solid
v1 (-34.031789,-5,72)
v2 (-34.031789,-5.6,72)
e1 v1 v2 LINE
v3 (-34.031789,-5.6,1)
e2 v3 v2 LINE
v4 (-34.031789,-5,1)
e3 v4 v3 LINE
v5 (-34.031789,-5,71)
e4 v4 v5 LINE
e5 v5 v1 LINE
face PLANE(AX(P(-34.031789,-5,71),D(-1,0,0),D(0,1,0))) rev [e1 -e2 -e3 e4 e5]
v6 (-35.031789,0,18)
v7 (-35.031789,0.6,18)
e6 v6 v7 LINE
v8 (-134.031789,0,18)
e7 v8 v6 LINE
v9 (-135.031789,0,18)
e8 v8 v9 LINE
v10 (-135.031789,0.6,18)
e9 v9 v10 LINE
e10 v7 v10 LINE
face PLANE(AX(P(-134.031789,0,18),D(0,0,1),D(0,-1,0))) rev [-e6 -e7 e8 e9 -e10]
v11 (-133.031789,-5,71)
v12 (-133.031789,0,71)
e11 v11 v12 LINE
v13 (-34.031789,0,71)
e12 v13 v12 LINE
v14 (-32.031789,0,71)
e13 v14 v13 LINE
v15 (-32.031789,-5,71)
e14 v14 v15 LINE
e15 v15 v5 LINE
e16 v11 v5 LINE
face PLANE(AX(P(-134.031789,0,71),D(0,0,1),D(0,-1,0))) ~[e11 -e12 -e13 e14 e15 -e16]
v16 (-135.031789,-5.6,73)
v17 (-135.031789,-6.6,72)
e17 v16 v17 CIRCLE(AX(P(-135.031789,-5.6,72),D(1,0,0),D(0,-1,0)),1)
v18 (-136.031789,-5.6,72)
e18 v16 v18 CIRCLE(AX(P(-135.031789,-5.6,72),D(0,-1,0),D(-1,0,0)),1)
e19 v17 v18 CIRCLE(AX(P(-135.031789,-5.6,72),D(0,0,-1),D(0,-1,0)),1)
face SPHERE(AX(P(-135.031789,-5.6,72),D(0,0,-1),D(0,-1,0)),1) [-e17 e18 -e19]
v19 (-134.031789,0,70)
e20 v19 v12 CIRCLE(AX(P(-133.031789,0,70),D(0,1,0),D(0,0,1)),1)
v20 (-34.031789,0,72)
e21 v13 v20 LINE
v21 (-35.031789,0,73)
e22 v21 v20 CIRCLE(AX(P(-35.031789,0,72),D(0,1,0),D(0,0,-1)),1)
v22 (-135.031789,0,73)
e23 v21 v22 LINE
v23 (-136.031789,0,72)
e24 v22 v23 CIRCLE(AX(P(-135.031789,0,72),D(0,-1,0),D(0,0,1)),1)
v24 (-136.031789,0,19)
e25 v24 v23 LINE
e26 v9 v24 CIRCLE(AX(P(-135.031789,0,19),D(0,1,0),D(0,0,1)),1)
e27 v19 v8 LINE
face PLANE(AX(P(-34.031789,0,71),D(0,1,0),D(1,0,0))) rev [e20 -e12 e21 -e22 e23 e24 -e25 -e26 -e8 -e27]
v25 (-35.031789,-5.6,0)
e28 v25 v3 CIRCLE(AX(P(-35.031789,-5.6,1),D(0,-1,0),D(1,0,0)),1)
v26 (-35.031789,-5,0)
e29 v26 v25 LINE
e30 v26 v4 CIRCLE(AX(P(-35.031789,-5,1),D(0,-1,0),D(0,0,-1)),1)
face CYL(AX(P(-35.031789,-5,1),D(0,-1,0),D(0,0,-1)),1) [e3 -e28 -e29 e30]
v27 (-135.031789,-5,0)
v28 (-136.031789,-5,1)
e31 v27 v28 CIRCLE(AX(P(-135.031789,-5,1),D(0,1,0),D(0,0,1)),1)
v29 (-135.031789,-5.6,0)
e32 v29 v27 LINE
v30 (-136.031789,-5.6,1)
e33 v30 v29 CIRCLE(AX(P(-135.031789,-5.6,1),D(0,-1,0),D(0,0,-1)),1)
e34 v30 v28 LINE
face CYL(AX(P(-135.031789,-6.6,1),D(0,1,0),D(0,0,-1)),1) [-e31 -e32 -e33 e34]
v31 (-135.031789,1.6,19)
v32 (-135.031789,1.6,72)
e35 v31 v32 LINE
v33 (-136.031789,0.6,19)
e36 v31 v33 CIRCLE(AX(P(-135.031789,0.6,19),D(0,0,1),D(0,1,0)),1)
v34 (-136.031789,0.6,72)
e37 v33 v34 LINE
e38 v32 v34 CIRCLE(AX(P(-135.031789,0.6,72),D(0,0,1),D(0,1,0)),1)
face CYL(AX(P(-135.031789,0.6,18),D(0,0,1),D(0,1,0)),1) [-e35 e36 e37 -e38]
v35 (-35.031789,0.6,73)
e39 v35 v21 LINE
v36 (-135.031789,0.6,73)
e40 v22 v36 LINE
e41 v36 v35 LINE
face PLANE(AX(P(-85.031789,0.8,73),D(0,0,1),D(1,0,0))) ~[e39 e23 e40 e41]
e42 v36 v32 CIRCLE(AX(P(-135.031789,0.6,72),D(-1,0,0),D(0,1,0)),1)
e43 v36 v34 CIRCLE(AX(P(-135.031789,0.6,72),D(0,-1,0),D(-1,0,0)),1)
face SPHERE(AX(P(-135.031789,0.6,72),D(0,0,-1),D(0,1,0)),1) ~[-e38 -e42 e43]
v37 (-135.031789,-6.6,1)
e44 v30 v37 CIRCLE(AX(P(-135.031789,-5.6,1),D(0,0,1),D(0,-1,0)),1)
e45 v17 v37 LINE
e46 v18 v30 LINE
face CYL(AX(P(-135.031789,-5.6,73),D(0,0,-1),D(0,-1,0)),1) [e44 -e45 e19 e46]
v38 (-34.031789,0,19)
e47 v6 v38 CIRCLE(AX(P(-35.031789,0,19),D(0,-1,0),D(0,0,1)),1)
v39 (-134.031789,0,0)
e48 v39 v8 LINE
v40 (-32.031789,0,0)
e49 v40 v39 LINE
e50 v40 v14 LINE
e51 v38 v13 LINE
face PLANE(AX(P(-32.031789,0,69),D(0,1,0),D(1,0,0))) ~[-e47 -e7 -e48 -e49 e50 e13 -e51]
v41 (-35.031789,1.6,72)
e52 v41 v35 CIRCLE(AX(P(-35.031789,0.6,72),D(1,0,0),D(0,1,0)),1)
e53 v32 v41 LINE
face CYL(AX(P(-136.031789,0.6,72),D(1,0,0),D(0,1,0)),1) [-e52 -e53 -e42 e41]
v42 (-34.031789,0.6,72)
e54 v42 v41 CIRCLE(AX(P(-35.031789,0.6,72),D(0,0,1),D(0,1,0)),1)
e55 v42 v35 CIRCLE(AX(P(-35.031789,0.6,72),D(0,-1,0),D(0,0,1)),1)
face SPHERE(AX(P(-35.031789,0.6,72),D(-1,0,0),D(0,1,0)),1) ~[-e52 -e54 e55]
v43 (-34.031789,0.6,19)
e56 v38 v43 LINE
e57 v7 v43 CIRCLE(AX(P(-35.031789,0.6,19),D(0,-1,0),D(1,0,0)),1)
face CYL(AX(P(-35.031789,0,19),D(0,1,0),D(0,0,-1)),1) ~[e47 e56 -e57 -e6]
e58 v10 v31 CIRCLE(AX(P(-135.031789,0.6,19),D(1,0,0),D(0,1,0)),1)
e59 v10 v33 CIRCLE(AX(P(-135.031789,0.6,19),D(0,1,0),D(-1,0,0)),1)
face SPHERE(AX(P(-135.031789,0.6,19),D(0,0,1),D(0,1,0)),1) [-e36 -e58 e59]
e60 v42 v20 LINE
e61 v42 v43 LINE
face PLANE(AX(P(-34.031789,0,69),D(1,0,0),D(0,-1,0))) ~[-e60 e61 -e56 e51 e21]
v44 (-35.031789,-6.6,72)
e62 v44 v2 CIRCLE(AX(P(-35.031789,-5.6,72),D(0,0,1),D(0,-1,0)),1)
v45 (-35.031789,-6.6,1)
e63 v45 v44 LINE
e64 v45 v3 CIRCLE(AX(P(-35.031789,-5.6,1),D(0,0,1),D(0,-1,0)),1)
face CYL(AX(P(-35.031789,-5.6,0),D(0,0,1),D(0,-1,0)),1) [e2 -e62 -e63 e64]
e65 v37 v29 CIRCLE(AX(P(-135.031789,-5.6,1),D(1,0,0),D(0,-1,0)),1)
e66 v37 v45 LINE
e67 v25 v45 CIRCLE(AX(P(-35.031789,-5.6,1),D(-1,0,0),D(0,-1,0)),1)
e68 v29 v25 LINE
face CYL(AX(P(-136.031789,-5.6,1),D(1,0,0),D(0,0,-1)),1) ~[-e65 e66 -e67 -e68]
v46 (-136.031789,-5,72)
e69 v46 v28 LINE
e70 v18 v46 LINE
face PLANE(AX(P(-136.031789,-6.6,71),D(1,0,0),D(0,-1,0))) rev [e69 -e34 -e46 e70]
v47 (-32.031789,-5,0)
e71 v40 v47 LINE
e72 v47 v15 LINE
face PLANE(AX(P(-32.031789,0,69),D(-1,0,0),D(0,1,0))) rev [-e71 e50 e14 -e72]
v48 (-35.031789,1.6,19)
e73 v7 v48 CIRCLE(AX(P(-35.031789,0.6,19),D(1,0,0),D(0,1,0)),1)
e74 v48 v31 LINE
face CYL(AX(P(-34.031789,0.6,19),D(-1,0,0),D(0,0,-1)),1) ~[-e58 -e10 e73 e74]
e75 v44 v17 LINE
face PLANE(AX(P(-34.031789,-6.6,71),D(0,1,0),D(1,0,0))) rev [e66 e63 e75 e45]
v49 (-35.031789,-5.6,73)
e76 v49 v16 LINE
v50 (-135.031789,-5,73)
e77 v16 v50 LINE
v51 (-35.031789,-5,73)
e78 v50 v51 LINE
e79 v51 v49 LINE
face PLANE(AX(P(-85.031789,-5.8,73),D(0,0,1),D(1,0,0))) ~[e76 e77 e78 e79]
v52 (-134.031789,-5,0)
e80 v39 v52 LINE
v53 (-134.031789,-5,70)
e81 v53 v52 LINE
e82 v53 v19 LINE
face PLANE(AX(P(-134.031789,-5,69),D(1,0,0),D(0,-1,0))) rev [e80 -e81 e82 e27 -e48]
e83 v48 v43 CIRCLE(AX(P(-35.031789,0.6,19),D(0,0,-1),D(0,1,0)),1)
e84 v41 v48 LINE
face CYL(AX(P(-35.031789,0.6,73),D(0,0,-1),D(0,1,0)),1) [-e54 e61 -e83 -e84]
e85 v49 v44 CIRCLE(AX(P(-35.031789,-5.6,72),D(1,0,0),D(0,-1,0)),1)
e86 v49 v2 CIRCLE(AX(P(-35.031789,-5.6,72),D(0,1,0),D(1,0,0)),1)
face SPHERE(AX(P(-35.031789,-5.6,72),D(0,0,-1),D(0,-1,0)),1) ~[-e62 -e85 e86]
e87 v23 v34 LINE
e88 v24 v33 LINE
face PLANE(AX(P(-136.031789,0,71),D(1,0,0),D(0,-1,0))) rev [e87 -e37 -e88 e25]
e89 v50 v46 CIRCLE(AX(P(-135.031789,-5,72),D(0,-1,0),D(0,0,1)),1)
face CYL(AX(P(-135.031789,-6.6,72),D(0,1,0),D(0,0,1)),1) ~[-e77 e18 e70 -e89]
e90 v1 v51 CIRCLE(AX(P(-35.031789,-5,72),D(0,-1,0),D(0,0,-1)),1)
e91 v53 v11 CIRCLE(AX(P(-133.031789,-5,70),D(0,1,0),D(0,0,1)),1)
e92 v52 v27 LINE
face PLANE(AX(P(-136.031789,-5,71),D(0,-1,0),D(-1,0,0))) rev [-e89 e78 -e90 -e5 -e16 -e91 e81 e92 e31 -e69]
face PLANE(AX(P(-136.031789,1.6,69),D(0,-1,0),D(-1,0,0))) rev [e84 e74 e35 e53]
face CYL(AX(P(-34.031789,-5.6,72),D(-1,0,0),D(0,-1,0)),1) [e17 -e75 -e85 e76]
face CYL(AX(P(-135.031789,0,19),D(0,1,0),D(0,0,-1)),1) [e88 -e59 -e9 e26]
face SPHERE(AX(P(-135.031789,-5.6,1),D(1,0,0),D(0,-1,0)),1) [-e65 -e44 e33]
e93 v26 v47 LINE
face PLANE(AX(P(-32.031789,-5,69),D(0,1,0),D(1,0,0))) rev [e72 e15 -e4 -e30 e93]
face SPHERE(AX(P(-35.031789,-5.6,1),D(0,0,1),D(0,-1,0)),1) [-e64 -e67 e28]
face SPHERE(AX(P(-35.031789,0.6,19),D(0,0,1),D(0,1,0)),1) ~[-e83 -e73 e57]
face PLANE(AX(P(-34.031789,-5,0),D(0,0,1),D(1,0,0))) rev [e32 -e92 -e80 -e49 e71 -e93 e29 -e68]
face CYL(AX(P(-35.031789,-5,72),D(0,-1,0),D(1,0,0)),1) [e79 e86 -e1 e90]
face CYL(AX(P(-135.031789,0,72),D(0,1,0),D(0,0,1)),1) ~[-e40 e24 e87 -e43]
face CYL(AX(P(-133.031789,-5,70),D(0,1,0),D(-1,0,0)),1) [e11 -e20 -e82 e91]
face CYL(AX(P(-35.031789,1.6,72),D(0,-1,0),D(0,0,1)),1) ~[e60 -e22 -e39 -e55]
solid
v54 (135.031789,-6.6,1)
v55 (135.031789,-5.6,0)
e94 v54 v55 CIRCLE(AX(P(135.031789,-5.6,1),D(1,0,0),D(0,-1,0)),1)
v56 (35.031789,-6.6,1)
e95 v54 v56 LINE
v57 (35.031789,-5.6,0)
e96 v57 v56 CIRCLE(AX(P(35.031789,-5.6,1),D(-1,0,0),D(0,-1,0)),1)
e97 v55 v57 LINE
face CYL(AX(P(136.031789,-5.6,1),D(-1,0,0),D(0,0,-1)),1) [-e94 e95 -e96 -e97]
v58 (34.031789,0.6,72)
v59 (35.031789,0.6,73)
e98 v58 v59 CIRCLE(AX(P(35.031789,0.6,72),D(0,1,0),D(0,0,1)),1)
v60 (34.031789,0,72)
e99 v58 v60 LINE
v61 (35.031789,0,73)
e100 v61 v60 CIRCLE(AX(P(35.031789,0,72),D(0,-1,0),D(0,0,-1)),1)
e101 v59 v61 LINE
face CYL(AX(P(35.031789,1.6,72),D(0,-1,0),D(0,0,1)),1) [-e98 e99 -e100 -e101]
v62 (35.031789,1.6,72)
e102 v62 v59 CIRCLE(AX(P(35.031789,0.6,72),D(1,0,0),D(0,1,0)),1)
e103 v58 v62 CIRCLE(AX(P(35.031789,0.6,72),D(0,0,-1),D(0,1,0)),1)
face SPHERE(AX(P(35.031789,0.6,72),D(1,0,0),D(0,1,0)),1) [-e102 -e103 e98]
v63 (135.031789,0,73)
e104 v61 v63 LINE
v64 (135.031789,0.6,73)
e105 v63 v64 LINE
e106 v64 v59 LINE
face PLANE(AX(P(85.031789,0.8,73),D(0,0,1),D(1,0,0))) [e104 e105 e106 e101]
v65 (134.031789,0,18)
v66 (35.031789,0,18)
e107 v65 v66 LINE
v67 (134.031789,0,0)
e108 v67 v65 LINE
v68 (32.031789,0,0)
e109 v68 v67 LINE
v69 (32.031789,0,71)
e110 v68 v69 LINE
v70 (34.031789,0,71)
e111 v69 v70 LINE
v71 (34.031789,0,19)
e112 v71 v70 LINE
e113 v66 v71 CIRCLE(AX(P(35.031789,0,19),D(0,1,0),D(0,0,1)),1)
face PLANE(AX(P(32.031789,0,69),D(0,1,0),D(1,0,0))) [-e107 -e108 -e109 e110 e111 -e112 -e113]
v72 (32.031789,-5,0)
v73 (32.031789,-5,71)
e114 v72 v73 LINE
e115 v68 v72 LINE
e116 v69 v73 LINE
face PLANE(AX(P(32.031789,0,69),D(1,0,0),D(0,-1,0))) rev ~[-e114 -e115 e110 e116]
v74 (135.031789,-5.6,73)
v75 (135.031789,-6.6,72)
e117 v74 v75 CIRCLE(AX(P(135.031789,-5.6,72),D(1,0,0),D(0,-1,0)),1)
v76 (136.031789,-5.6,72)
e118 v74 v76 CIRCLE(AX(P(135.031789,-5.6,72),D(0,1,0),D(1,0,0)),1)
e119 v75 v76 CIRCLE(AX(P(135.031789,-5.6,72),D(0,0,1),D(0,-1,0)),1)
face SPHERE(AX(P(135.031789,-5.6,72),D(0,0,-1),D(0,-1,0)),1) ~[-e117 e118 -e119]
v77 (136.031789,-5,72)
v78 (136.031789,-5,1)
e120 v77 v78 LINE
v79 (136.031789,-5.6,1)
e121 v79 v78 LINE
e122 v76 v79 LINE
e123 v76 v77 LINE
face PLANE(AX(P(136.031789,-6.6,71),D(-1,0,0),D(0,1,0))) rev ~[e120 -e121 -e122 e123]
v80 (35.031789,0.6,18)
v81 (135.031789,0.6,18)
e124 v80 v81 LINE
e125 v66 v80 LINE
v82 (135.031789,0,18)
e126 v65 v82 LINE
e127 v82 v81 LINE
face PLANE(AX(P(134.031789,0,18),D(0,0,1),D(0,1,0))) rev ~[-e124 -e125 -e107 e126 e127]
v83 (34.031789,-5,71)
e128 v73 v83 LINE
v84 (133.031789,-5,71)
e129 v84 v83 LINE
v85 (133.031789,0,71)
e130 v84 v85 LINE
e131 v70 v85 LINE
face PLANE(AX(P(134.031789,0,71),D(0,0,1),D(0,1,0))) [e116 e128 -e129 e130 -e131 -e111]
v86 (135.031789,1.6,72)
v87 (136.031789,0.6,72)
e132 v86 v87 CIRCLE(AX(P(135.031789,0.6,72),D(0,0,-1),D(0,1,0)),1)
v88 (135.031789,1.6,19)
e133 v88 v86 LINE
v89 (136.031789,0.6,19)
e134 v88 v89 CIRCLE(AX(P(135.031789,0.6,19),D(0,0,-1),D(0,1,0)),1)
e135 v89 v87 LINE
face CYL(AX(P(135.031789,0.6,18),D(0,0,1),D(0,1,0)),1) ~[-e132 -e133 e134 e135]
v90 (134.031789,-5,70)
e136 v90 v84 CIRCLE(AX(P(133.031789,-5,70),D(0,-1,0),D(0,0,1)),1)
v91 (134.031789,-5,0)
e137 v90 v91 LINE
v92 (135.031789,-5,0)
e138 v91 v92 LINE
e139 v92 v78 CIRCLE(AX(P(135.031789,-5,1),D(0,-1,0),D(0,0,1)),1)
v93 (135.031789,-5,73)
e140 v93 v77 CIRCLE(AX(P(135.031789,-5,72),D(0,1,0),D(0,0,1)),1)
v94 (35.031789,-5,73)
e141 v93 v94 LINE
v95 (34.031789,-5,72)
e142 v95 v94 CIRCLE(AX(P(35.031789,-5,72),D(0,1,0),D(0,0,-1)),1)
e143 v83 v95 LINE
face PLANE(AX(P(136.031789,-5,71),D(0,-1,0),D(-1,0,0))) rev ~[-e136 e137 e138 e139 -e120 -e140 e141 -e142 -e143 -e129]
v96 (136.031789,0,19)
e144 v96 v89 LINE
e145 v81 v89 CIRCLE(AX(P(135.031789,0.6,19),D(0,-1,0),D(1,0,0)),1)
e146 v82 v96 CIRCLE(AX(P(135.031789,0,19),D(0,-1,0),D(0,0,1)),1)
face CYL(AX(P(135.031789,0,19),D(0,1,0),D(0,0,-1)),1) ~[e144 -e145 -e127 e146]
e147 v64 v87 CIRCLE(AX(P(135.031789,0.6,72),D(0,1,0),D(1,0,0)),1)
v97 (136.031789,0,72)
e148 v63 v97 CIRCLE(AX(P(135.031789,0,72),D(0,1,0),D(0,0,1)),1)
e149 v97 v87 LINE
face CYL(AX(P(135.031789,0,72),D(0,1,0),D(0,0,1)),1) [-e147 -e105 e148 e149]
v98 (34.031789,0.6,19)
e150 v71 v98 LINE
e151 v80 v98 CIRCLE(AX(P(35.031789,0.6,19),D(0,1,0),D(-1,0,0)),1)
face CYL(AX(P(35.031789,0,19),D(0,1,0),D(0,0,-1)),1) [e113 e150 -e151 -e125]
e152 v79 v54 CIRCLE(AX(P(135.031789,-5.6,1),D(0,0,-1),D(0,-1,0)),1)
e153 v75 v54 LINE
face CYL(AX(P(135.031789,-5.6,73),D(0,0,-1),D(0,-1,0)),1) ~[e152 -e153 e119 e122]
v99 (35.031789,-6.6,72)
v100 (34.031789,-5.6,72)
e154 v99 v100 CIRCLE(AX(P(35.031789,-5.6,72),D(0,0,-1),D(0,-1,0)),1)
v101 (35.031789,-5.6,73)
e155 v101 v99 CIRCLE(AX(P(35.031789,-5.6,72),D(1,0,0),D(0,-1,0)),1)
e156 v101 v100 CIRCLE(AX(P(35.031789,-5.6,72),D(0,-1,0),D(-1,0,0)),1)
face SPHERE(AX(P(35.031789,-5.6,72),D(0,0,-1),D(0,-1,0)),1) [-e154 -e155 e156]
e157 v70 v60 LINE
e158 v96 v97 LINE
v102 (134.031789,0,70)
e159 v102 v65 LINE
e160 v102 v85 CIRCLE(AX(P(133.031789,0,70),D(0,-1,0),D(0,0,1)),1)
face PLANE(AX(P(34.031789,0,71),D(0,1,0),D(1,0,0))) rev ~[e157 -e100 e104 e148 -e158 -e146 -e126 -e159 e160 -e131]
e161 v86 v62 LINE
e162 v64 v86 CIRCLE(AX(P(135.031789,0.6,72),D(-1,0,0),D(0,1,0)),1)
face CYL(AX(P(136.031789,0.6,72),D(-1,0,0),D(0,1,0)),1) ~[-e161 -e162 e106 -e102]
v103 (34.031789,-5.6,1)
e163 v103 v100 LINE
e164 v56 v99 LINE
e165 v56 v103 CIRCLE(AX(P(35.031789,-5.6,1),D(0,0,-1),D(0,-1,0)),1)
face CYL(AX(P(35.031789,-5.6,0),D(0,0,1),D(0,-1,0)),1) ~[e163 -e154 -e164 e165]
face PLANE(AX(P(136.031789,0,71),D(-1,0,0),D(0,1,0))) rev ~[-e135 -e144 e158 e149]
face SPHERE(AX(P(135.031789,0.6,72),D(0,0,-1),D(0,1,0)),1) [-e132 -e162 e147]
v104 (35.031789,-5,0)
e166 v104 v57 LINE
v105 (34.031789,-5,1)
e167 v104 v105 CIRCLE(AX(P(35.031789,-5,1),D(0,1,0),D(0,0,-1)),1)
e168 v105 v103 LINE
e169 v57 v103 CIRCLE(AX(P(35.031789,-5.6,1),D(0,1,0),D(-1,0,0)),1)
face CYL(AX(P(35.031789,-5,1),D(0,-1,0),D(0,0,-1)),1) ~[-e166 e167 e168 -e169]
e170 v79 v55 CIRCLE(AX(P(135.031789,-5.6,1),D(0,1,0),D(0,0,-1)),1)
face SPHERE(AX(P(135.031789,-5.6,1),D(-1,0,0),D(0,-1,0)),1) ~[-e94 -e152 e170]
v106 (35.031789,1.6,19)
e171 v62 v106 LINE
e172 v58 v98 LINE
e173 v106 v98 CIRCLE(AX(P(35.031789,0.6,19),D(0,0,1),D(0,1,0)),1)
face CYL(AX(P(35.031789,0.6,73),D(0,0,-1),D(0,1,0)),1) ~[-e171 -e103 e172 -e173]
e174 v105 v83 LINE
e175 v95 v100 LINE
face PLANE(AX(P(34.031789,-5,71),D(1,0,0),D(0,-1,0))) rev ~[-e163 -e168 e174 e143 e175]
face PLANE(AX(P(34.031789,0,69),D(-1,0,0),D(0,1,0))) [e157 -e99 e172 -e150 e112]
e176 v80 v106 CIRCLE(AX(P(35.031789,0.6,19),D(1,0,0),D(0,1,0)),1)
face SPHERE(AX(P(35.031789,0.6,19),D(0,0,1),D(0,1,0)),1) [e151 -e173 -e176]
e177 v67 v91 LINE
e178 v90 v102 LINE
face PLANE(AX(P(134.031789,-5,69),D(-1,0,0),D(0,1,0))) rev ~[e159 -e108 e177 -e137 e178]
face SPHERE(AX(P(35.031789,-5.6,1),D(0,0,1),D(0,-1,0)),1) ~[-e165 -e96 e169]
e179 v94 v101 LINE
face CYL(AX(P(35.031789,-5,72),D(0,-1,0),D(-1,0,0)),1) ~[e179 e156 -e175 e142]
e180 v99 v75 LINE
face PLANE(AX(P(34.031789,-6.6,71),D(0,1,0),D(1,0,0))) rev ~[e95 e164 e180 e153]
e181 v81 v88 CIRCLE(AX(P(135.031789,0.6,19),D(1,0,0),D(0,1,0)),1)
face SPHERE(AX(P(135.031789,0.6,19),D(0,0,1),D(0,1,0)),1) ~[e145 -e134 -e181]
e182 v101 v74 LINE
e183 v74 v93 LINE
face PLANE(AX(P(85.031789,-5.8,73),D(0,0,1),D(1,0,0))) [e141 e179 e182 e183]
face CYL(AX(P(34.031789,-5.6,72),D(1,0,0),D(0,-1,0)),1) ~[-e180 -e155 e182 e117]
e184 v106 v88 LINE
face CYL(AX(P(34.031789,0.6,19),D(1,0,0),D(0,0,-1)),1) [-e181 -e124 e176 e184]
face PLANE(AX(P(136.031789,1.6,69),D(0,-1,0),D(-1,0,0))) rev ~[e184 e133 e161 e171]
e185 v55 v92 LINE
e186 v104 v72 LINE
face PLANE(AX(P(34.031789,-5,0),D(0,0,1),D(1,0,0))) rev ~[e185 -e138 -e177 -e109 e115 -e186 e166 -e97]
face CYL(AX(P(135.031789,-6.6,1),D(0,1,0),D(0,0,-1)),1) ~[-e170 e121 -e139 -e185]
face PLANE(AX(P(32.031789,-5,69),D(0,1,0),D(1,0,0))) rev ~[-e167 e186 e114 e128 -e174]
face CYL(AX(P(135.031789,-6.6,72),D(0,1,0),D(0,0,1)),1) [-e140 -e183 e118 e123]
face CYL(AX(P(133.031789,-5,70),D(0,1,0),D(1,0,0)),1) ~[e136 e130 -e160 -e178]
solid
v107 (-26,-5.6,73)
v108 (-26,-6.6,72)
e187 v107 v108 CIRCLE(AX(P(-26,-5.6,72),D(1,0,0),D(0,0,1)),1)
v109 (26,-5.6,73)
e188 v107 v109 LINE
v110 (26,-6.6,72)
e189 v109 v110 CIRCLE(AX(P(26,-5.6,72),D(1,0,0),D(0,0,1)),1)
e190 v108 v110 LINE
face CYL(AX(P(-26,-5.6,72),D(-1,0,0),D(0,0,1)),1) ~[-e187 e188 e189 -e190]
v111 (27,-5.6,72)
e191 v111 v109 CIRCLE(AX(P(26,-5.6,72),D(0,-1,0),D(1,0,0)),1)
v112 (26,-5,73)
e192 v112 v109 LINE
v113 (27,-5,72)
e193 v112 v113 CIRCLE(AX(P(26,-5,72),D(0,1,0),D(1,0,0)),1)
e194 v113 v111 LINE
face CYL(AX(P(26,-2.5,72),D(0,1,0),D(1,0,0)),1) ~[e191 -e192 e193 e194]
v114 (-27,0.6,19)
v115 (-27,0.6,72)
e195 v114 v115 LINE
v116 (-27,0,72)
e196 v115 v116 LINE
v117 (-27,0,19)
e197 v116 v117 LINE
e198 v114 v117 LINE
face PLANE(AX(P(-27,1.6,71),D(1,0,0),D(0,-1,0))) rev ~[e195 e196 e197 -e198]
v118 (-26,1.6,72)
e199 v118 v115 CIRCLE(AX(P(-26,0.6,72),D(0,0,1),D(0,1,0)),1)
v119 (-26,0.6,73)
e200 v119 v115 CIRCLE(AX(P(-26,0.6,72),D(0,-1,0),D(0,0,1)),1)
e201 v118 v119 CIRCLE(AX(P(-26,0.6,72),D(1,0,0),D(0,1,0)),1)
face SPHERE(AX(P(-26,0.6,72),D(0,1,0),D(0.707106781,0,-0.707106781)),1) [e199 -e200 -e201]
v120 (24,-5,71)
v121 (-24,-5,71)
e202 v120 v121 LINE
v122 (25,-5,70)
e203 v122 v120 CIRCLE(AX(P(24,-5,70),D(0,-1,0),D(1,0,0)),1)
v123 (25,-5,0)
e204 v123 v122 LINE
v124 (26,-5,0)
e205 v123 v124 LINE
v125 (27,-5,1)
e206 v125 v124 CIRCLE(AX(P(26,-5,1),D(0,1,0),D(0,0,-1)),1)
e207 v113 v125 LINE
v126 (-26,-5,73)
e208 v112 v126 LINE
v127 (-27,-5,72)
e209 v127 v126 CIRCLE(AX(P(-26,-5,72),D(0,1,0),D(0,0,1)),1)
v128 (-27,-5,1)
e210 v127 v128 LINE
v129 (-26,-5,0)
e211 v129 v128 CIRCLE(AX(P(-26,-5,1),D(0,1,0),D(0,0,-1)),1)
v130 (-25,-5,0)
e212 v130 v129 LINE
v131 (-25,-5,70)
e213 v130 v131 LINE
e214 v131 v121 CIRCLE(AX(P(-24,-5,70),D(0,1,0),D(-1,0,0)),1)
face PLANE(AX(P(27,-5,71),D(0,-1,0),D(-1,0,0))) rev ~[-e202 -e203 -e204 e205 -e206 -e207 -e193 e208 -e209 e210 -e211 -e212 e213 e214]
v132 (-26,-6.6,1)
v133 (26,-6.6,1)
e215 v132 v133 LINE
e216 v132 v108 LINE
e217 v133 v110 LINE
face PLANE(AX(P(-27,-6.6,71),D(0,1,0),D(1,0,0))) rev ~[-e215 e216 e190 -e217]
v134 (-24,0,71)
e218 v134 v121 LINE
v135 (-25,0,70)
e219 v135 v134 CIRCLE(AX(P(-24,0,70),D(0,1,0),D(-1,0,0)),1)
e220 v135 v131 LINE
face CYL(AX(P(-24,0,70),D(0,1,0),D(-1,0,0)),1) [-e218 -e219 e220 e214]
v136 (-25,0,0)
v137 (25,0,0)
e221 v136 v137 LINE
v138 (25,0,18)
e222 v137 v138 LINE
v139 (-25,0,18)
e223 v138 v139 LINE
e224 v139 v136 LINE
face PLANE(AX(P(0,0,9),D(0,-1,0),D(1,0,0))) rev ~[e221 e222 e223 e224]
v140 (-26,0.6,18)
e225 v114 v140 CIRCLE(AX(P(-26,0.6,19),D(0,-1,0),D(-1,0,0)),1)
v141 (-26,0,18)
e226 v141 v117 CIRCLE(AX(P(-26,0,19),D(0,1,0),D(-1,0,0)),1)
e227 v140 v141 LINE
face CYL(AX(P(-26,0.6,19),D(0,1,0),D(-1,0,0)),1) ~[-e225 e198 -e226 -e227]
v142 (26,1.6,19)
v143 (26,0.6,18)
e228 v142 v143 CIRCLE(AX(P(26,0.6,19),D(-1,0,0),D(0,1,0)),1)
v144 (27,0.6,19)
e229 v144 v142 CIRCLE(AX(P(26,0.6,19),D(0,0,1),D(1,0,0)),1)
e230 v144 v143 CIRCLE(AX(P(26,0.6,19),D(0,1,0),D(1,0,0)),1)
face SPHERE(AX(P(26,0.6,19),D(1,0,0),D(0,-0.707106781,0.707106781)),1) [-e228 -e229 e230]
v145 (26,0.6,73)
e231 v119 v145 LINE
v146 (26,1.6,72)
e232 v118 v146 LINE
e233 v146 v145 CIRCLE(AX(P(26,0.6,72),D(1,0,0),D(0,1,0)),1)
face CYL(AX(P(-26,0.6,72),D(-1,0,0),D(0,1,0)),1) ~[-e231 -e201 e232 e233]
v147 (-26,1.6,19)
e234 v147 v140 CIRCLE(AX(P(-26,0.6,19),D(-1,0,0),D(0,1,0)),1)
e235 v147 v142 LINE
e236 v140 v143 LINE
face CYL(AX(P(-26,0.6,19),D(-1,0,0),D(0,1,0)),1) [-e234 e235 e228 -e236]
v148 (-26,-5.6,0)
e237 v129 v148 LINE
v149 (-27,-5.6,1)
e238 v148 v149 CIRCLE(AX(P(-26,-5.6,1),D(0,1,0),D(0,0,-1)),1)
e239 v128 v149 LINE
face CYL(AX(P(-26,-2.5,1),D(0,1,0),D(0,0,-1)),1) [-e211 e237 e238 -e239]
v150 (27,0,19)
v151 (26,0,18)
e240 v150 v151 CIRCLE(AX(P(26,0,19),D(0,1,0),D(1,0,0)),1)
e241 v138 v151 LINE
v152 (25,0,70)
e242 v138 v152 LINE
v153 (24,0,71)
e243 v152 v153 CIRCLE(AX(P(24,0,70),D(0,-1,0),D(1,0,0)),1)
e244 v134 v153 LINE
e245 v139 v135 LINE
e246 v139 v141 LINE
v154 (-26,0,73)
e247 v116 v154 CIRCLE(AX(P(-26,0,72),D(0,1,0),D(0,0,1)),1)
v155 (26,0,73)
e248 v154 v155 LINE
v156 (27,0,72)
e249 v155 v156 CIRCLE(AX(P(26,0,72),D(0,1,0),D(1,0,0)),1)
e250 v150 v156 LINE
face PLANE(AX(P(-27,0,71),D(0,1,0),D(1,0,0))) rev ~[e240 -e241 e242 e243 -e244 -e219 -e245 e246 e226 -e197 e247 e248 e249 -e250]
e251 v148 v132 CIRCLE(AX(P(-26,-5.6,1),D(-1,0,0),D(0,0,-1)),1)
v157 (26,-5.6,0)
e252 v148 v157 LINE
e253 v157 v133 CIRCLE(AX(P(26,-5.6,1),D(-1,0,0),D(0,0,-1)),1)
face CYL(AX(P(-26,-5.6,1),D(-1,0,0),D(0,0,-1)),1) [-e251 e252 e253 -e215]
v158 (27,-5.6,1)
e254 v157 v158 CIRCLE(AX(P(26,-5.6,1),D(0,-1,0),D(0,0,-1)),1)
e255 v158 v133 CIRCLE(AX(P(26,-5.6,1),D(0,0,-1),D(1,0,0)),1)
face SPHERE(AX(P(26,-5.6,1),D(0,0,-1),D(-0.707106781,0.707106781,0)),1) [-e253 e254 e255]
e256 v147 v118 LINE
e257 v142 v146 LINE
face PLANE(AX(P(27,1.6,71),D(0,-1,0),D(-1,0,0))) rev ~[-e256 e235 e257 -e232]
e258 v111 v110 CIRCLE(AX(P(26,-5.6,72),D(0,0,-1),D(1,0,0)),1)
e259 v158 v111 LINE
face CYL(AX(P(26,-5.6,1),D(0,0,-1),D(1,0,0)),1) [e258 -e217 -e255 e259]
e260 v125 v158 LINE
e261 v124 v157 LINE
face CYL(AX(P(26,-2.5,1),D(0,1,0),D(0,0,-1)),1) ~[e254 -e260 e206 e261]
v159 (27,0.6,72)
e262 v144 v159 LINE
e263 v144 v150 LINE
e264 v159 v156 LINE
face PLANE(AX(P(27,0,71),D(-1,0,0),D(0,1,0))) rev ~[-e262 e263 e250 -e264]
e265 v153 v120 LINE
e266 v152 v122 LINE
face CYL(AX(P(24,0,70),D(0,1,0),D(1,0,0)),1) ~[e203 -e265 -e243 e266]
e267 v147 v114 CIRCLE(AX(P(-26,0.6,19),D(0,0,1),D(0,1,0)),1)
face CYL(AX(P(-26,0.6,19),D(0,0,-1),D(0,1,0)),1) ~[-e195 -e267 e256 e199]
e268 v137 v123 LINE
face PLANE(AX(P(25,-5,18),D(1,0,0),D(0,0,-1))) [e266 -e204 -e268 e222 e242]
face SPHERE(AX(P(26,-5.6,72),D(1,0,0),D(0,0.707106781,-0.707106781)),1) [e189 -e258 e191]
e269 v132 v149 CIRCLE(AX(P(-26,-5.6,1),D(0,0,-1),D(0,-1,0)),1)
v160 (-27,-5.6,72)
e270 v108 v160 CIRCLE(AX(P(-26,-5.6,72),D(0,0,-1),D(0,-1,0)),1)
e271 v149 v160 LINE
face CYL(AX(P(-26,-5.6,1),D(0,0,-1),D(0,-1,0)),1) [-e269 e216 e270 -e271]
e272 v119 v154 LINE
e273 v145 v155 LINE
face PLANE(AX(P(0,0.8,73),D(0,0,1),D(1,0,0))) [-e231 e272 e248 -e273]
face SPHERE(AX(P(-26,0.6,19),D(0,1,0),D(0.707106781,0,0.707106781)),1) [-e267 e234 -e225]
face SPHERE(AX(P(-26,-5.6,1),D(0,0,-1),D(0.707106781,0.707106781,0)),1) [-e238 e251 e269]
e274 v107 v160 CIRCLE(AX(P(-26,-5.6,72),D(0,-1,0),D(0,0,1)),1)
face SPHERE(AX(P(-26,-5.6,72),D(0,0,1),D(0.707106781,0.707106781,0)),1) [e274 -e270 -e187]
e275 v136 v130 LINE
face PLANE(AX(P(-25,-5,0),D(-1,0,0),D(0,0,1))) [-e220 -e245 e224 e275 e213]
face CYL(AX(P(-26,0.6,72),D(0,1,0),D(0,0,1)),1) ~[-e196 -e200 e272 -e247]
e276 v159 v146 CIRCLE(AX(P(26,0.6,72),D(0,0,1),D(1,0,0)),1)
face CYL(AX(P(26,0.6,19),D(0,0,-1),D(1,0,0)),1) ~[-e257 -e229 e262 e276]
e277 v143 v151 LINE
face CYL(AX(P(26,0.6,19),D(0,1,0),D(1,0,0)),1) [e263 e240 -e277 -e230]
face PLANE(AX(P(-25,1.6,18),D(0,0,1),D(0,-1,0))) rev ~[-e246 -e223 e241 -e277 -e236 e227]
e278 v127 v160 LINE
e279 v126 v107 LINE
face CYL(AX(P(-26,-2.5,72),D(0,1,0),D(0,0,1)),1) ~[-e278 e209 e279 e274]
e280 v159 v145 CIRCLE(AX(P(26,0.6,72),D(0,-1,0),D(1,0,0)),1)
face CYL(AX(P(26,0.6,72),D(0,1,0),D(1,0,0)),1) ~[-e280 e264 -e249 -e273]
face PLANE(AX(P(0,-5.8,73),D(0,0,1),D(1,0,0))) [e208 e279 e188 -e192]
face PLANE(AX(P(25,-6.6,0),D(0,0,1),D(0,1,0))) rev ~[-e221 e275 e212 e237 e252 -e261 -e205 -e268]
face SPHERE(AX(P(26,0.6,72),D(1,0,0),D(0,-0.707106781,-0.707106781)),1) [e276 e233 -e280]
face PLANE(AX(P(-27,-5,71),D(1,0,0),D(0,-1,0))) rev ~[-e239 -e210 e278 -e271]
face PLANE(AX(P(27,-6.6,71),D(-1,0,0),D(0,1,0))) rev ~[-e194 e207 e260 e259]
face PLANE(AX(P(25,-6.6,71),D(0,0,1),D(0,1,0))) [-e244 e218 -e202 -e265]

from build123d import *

# Parameters (mm, degrees)
F0_W          = 50
F0_H          = 51
F1_DEPTH      = 5
F0_H_2        = 18
F2_DEPTH      = 5
F3_W          = 50
F3_H          = 51
F4_DEPTH      = 1.6
F5_W          = 50
F5_H          = 51
F6_DEPTH      = 1.6
F7_DEPTH      = 2
F8_W          = 1.6
F8_H          = 53
F9_DEPTH      = 2
F10_W         = 1.6
F10_H         = 53
F11_DEPTH     = 2
F12_DEPTH     = 1.6
F13_DEPTH     = 18
F15_DEPTH     = 2
F16_T1_DEPTH  = 52
F16_T3_DEPTH  = 5
F16_T5_DEPTH  = 3.1
F16_T7_DEPTH  = 3.1
F16_T9_DEPTH  = 53
F16_T11_DEPTH = 71
F16_S15_W     = 1.02
F16_S15_H     = 1.02
F16_T16_DEPTH = 1.02
F16_S21_W     = 1.02
F16_S21_H     = 1.02
F16_T22_DEPTH = 1.02
F16_S27_W     = 1.02
F16_S27_H     = 1.02
F16_T28_DEPTH = 1.02
F16_S33_W     = 1.02
F16_S33_H     = 1.02
F16_T34_DEPTH = 1.02
F16_S39_W     = 1.02
F16_S39_H     = 1.02
F16_T40_DEPTH = 1.02
F16_S45_W     = 1.02
F16_S45_H     = 1.02
F16_T46_DEPTH = 1.02
F16_S51_W     = 1.02
F16_S51_H     = 1.02
F16_T52_DEPTH = 1.02
F16_S57_W     = 1.02
F16_S57_H     = 1.02
F16_T58_DEPTH = 1.02
F17_W         = 102
F17_H         = 69
F18_DEPTH     = 5
F19_W         = 100
F19_H         = 51
F20_DEPTH     = 1.6
F21_W         = 100
F21_H         = 69
F22_DEPTH     = 1.6
F23_W         = 1.6
F23_H         = 51
F23_H_2       = 69
F24_DEPTH     = 2
F25_DEPTH     = 2
F27_DEPTH     = 2
F28_R         = 1


# Not quite as in the source:
# - a fillet or chamfer that OpenCascade refuses, or shapes differently, is made with other operations: its cross-section is extruded or revolved along the edge and cut away or added


with BuildPart() as f1:
    # F0 (on Front) → F1 (new body)
    with BuildSketch(Plane.XZ):
        with Locations((0, 43.5)):
            Rectangle(F0_W, F0_H)
    extrude(amount=F1_DEPTH)

    # F0 (on Front) → F2 (join)
    with BuildSketch(Plane.XZ):
        with Locations((0, 9)):
            Rectangle(F0_W, F0_H_2)
        with Locations((0, 43.5)):
            Rectangle(F0_W, F0_H)
    extrude(amount=F2_DEPTH)

    # F3 (on face) → F4 (join)
    with BuildSketch(Plane(origin=(0, 0, 0), x_dir=(-1, 0, 0), z_dir=(0, 1, 0))):
        with Locations((0, 43.5)):
            Rectangle(F3_W, F3_H)
    extrude(amount=F4_DEPTH)

    # F5 (on face) → F6 (join)
    with BuildSketch(Plane.XZ.offset(5)):
        with Locations((0, 43.5)):
            Rectangle(F5_W, F5_H)
    extrude(amount=F6_DEPTH)

    # F7 (add): a face of the model
    f7_faces = [f1.faces().sort_by_distance(p)[0] for p in [
        (0, -2.5, 69),
    ]]
    extrude(f7_faces, amount=F7_DEPTH)

    # F8 (on face) → F9 (join)
    with BuildSketch(Plane(origin=(-25, 0, 0), x_dir=(0, -1, 0), z_dir=(-1, 0, 0))):
        with Locations((-0.8, 44.5)):
            Rectangle(F8_W, F8_H)
        with Locations((5.8, 44.5)):
            Rectangle(F8_W, F8_H)
    extrude(amount=F9_DEPTH)

    # F10 (on face) → F11 (join)
    with BuildSketch(Plane.YZ.offset(25)):
        with Locations((-5.8, 44.5)):
            Rectangle(F10_W, F10_H)
        with Locations((0.8, 44.5)):
            Rectangle(F10_W, F10_H)
    extrude(amount=F11_DEPTH)

    # F12 (add): a face of the model
    f12_faces = [f1.faces().sort_by_distance(p)[0] for p in [
        (0, -5, 9),
    ]]
    extrude(f12_faces, amount=F12_DEPTH)

    # F13 (add, through all): faces of the model
    f13_faces = [f1.faces().sort_by_distance(p)[0] for p in [
        (26, -5.8, 18),
        (-26, -5.8, 18),
    ]]
    extrude(f13_faces, amount=F13_DEPTH)

    # F14 (on face) → F15 (join)
    with BuildSketch(Plane.XY.offset(71)):
        Polygon((25, -5), (-25, -5), (-27, -5), (-27, -6.6), (27, -6.6), (27, -5), align=None)
        Polygon((-27, 0), (-25, 0), (25, 0), (27, 0), (27, 1.6), (-27, 1.6), align=None)
    extrude(amount=F15_DEPTH)

    # F16: fillet of radius 1 on 20 edges, made by hand

    # F16_s2 → F16_t1 (cut)
    with BuildSketch(Plane.YZ.offset(-26)):
        with BuildLine():
            ThreePointArc((1.6, 19), (1.3071067812, 18.2928932188), (0.6, 18))
            Line((0.6, 18), (1.6, 18))
            Line((1.6, 18), (1.6, 19))
        make_face()
        with BuildLine():
            ThreePointArc((-5.6, 0), (-6.3071067812, 0.2928932188), (-6.6, 1))
            Line((-6.6, 1), (-6.6, 0))
            Line((-6.6, 0), (-5.6, 0))
        make_face()
        with BuildLine():
            ThreePointArc((1.6, 72), (1.3071067812, 72.7071067812), (0.6, 73))
            Line((0.6, 73), (1.6, 73))
            Line((1.6, 73), (1.6, 72))
        make_face()
        with BuildLine():
            ThreePointArc((-5.6, 73), (-6.3071067812, 72.7071067812), (-6.6, 72))
            Line((-6.6, 72), (-6.6, 73))
            Line((-6.6, 73), (-5.6, 73))
        make_face()
    extrude(amount=F16_T1_DEPTH, mode=Mode.SUBTRACT)

    # F16_s4 → F16_t3 (cut)
    with BuildSketch(Plane.XZ):
        with BuildLine():
            ThreePointArc((-25, 70), (-24.7071067812, 70.7071067812), (-24, 71))
            Line((-24, 71), (-25, 71))
            Line((-25, 71), (-25, 70))
        make_face()
        with BuildLine():
            ThreePointArc((25, 70), (24.7071067812, 70.7071067812), (24, 71))
            Line((24, 71), (25, 71))
            Line((25, 71), (25, 70))
        make_face()
    extrude(amount=F16_T3_DEPTH, mode=Mode.SUBTRACT)

    # F16_s6 → F16_t5 (cut)
    with BuildSketch(Plane.XZ.offset(-0.6)):
        with BuildLine():
            ThreePointArc((-27, 19), (-26.7071067812, 18.2928932188), (-26, 18))
            Line((-26, 18), (-27, 18))
            Line((-27, 18), (-27, 19))
        make_face()
        with BuildLine():
            ThreePointArc((27, 19), (26.7071067812, 18.2928932188), (26, 18))
            Line((26, 18), (27, 18))
            Line((27, 18), (27, 19))
        make_face()
        with BuildLine():
            ThreePointArc((27, 72), (26.7071067812, 72.7071067812), (26, 73))
            Line((26, 73), (27, 73))
            Line((27, 73), (27, 72))
        make_face()
        with BuildLine():
            ThreePointArc((-26, 73), (-26.7071067812, 72.7071067812), (-27, 72))
            Line((-27, 72), (-27, 73))
            Line((-27, 73), (-26, 73))
        make_face()
    extrude(amount=F16_T5_DEPTH, mode=Mode.SUBTRACT)

    # F16_s8 → F16_t7 (cut)
    with BuildSketch(Plane.XZ.offset(2.5)):
        with BuildLine():
            ThreePointArc((27, 72), (26.7071067812, 72.7071067812), (26, 73))
            Line((26, 73), (27, 73))
            Line((27, 73), (27, 72))
        make_face()
        with BuildLine():
            ThreePointArc((-26, 73), (-26.7071067812, 72.7071067812), (-27, 72))
            Line((-27, 72), (-27, 73))
            Line((-27, 73), (-26, 73))
        make_face()
        with BuildLine():
            ThreePointArc((-26, 0), (-26.7071067812, 0.2928932188), (-27, 1))
            Line((-27, 1), (-27, 0))
            Line((-27, 0), (-26, 0))
        make_face()
        with BuildLine():
            ThreePointArc((26, 0), (26.7071067812, 0.2928932188), (27, 1))
            Line((27, 1), (27, 0))
            Line((27, 0), (26, 0))
        make_face()
    extrude(amount=F16_T7_DEPTH, mode=Mode.SUBTRACT)

    # F16_s10 → F16_t9 (cut)
    with BuildSketch(Plane.XY.offset(19)):
        with BuildLine():
            ThreePointArc((27, 0.6), (26.7071067812, 1.3071067812), (26, 1.6))
            Line((26, 1.6), (27, 1.6))
            Line((27, 1.6), (27, 0.6))
        make_face()
        with BuildLine():
            ThreePointArc((-26, 1.6), (-26.7071067812, 1.3071067812), (-27, 0.6))
            Line((-27, 0.6), (-27, 1.6))
            Line((-27, 1.6), (-26, 1.6))
        make_face()
    extrude(amount=F16_T9_DEPTH, mode=Mode.SUBTRACT)

    # F16_s12 → F16_t11 (cut)
    with BuildSketch(Plane.XY.offset(1)):
        with BuildLine():
            ThreePointArc((27, -5.6), (26.7071067812, -6.3071067812), (26, -6.6))
            Line((26, -6.6), (27, -6.6))
            Line((27, -6.6), (27, -5.6))
        make_face()
        with BuildLine():
            ThreePointArc((-26, -6.6), (-26.7071067812, -6.3071067812), (-27, -5.6))
            Line((-27, -5.6), (-27, -6.6))
            Line((-27, -6.6), (-26, -6.6))
        make_face()
    extrude(amount=F16_T11_DEPTH, mode=Mode.SUBTRACT)


with BuildPart() as f16_tool14:
    # F16_s15 → F16_t16 (new body)
    with BuildSketch(Plane.YZ.offset(26)):
        with Locations((1.11, 18.49)):
            Rectangle(F16_S15_W, F16_S15_H)
    extrude(amount=F16_T16_DEPTH)

    # F16_s17 → F16_t18 (revolve, cut)
    with BuildSketch(Plane(origin=(26, 0.6, 19), x_dir=(0, -0.7071067812, 0.7071067812), z_dir=(0, 0.7071067812, 0.7071067812))):
        with BuildLine():
            ThreePointArc((0, -1), (1, 0), (0, 1))
            Line((0, 1), (0, -1))
        make_face()
    revolve(axis=Axis((26, 0.6, 19), (1, 0, 0)), mode=Mode.SUBTRACT)


with BuildPart() as f1_1:
    add(f1.part)

    # F16_t13: cut F16_tool14
    add(f16_tool14.part, mode=Mode.SUBTRACT)


with BuildPart() as f16_tool20:
    # F16_s21 → F16_t22 (new body)
    with BuildSketch(Plane.XZ.offset(-0.6)):
        with Locations((-26.51, 18.49)):
            Rectangle(F16_S21_W, F16_S21_H)
    extrude(amount=-F16_T22_DEPTH)

    # F16_s23 → F16_t24 (revolve, cut)
    with BuildSketch(Plane(origin=(-26, 0.6, 19), x_dir=(0.7071067812, 0, 0.7071067812), z_dir=(-0.7071067812, 0, 0.7071067812))):
        with BuildLine():
            ThreePointArc((0, -1), (1, 0), (0, 1))
            Line((0, 1), (0, -1))
        make_face()
    revolve(axis=Axis((-26, 0.6, 19), (0, 1, 0)), mode=Mode.SUBTRACT)


with BuildPart() as f1_2:
    add(f1_1.part)

    # F16_t19: cut F16_tool20
    add(f16_tool20.part, mode=Mode.SUBTRACT)


with BuildPart() as f16_tool26:
    # F16_s27 → F16_t28 (new body)
    with BuildSketch(Plane.XY.offset(1)):
        with Locations((26.51, -6.11)):
            Rectangle(F16_S27_W, F16_S27_H)
    extrude(amount=-F16_T28_DEPTH)

    # F16_s29 → F16_t30 (revolve, cut)
    with BuildSketch(Plane(origin=(26, -5.6, 1), x_dir=(-0.7071067812, 0.7071067812, 0), z_dir=(-0.7071067812, -0.7071067812, 0))):
        with BuildLine():
            ThreePointArc((0, -1), (1, 0), (0, 1))
            Line((0, 1), (0, -1))
        make_face()
    revolve(axis=Axis((26, -5.6, 1), (0, 0, -1)), mode=Mode.SUBTRACT)


with BuildPart() as f1_3:
    add(f1_2.part)

    # F16_t25: cut F16_tool26
    add(f16_tool26.part, mode=Mode.SUBTRACT)


with BuildPart() as f16_tool32:
    # F16_s33 → F16_t34 (new body)
    with BuildSketch(Plane.XY.offset(1)):
        with Locations((-26.51, -6.11)):
            Rectangle(F16_S33_W, F16_S33_H)
    extrude(amount=-F16_T34_DEPTH)

    # F16_s35 → F16_t36 (revolve, cut)
    with BuildSketch(Plane(origin=(-26, -5.6, 1), x_dir=(0.7071067812, 0.7071067812, 0), z_dir=(-0.7071067812, 0.7071067812, 0))):
        with BuildLine():
            ThreePointArc((0, -1), (1, 0), (0, 1))
            Line((0, 1), (0, -1))
        make_face()
    revolve(axis=Axis((-26, -5.6, 1), (0, 0, -1)), mode=Mode.SUBTRACT)


with BuildPart() as f1_4:
    add(f1_3.part)

    # F16_t31: cut F16_tool32
    add(f16_tool32.part, mode=Mode.SUBTRACT)


with BuildPart() as f16_tool38:
    # F16_s39 → F16_t40 (new body)
    with BuildSketch(Plane.YZ.offset(26)):
        with Locations((-6.11, 72.51)):
            Rectangle(F16_S39_W, F16_S39_H)
    extrude(amount=F16_T40_DEPTH)

    # F16_s41 → F16_t42 (revolve, cut)
    with BuildSketch(Plane(origin=(26, -5.6, 72), x_dir=(0, 0.7071067812, -0.7071067812), z_dir=(0, -0.7071067812, -0.7071067812))):
        with BuildLine():
            ThreePointArc((0, -1), (1, 0), (0, 1))
            Line((0, 1), (0, -1))
        make_face()
    revolve(axis=Axis((26, -5.6, 72), (1, 0, 0)), mode=Mode.SUBTRACT)


with BuildPart() as f1_5:
    add(f1_4.part)

    # F16_t37: cut F16_tool38
    add(f16_tool38.part, mode=Mode.SUBTRACT)


with BuildPart() as f16_tool44:
    # F16_s45 → F16_t46 (new body)
    with BuildSketch(Plane.YZ.offset(26)):
        with Locations((1.11, 72.51)):
            Rectangle(F16_S45_W, F16_S45_H)
    extrude(amount=F16_T46_DEPTH)

    # F16_s47 → F16_t48 (revolve, cut)
    with BuildSketch(Plane(origin=(26, 0.6, 72), x_dir=(0, -0.7071067812, -0.7071067812), z_dir=(0, -0.7071067812, 0.7071067812))):
        with BuildLine():
            ThreePointArc((0, -1), (1, 0), (0, 1))
            Line((0, 1), (0, -1))
        make_face()
    revolve(axis=Axis((26, 0.6, 72), (1, 0, 0)), mode=Mode.SUBTRACT)


with BuildPart() as f1_6:
    add(f1_5.part)

    # F16_t43: cut F16_tool44
    add(f16_tool44.part, mode=Mode.SUBTRACT)


with BuildPart() as f16_tool50:
    # F16_s51 → F16_t52 (new body)
    with BuildSketch(Plane.XZ.offset(-0.6)):
        with Locations((-26.51, 72.51)):
            Rectangle(F16_S51_W, F16_S51_H)
    extrude(amount=-F16_T52_DEPTH)

    # F16_s53 → F16_t54 (revolve, cut)
    with BuildSketch(Plane(origin=(-26, 0.6, 72), x_dir=(0.7071067812, 0, -0.7071067812), z_dir=(0.7071067812, 0, 0.7071067812))):
        with BuildLine():
            ThreePointArc((0, -1), (1, 0), (0, 1))
            Line((0, 1), (0, -1))
        make_face()
    revolve(axis=Axis((-26, 0.6, 72), (0, 1, 0)), mode=Mode.SUBTRACT)


with BuildPart() as f1_7:
    add(f1_6.part)

    # F16_t49: cut F16_tool50
    add(f16_tool50.part, mode=Mode.SUBTRACT)


with BuildPart() as f16_tool56:
    # F16_s57 → F16_t58 (new body)
    with BuildSketch(Plane.XY.offset(72)):
        with Locations((-26.51, -6.11)):
            Rectangle(F16_S57_W, F16_S57_H)
    extrude(amount=F16_T58_DEPTH)

    # F16_s59 → F16_t60 (revolve, cut)
    with BuildSketch(Plane(origin=(-26, -5.6, 72), x_dir=(0.7071067812, 0.7071067812, 0), z_dir=(0.7071067812, -0.7071067812, 0))):
        with BuildLine():
            ThreePointArc((0, -1), (1, 0), (0, 1))
            Line((0, 1), (0, -1))
        make_face()
    revolve(axis=Axis((-26, -5.6, 72), (0, 0, 1)), mode=Mode.SUBTRACT)


with BuildPart() as f1_8:
    add(f1_7.part)

    # F16_t55: cut F16_tool56
    add(f16_tool56.part, mode=Mode.SUBTRACT)


with BuildPart() as f18:
    # F17 (on Front) → F18 (new body)
    with BuildSketch(Plane.XZ):
        with Locations((83.031789422, 34.5)):
            Rectangle(F17_W, F17_H)
    extrude(amount=F18_DEPTH)

    # F19 (on face) → F20 (join)
    with BuildSketch(Plane(origin=(0, 0, 0), x_dir=(-1, 0, 0), z_dir=(0, 1, 0))):
        with Locations((-84.031789422, 43.5)):
            Rectangle(F19_W, F19_H)
    extrude(amount=F20_DEPTH)

    # F21 (on face) → F22 (join)
    with BuildSketch(Plane.XZ.offset(5)):
        with Locations((84.031789422, 34.5)):
            Rectangle(F21_W, F21_H)
    extrude(amount=F22_DEPTH)

    # F23 (on face) → F24 (join)
    with BuildSketch(Plane.YZ.offset(134.031789422)):
        with Locations((0.8, 43.5)):
            Rectangle(F23_W, F23_H)
        with Locations((-5.8, 34.5)):
            Rectangle(F23_W, F23_H_2)
    extrude(amount=F24_DEPTH)

    # F25 (add): a face of the model
    f25_faces = [f18.faces().sort_by_distance(p)[0] for p in [
        (83.8122772269, -2.5, 69),
    ]]
    extrude(f25_faces, amount=F25_DEPTH)

    # F26 (on face) → F27 (join)
    with BuildSketch(Plane.XY.offset(71)):
        Polygon((136.031789422, -5), (134.031789422, -5), (34.031789422, -5), (34.031789422, -6.6), (136.031789422, -6.6), align=None)
        Polygon((34.031789422, 1.6), (34.031789422, 0), (134.031789422, 0), (136.031789422, 0), (136.031789422, 1.6), align=None)
    extrude(amount=F27_DEPTH)

    # F28
    f28_edges = [f18.edges().sort_by_distance(p)[0] for p in [
        (34.031789, -6.6, 36.5),
        (85.031789, -6.6, 0),
        (136.031789, -6.6, 36.5),
        (85.031789, -6.6, 73),
        (34.031789, -5.8, 0),
        (136.031789, 1.6, 45.5),
        (85.031789, 1.6, 73),
        (34.031789, 1.6, 45.5),
        (85.031789, 1.6, 18),
        (34.031789, 0.8, 18),
        (134.031789, -2.5, 71),
        (34.031789, -5.8, 73),
        (136.031789, -5.8, 73),
        (136.031789, -5.8, 0),
        (136.031789, 0.8, 18),
        (136.031789, 0.8, 73),
        (34.031789, 0.8, 73),
    ]]
    fillet(f28_edges, radius=F28_R)


with BuildPart() as f29_1:
    # F29: instance of F18
    add(f18.part.mirror(Plane.YZ))


solid = Compound([f1_8.part, f18.part, f29_1.part])
